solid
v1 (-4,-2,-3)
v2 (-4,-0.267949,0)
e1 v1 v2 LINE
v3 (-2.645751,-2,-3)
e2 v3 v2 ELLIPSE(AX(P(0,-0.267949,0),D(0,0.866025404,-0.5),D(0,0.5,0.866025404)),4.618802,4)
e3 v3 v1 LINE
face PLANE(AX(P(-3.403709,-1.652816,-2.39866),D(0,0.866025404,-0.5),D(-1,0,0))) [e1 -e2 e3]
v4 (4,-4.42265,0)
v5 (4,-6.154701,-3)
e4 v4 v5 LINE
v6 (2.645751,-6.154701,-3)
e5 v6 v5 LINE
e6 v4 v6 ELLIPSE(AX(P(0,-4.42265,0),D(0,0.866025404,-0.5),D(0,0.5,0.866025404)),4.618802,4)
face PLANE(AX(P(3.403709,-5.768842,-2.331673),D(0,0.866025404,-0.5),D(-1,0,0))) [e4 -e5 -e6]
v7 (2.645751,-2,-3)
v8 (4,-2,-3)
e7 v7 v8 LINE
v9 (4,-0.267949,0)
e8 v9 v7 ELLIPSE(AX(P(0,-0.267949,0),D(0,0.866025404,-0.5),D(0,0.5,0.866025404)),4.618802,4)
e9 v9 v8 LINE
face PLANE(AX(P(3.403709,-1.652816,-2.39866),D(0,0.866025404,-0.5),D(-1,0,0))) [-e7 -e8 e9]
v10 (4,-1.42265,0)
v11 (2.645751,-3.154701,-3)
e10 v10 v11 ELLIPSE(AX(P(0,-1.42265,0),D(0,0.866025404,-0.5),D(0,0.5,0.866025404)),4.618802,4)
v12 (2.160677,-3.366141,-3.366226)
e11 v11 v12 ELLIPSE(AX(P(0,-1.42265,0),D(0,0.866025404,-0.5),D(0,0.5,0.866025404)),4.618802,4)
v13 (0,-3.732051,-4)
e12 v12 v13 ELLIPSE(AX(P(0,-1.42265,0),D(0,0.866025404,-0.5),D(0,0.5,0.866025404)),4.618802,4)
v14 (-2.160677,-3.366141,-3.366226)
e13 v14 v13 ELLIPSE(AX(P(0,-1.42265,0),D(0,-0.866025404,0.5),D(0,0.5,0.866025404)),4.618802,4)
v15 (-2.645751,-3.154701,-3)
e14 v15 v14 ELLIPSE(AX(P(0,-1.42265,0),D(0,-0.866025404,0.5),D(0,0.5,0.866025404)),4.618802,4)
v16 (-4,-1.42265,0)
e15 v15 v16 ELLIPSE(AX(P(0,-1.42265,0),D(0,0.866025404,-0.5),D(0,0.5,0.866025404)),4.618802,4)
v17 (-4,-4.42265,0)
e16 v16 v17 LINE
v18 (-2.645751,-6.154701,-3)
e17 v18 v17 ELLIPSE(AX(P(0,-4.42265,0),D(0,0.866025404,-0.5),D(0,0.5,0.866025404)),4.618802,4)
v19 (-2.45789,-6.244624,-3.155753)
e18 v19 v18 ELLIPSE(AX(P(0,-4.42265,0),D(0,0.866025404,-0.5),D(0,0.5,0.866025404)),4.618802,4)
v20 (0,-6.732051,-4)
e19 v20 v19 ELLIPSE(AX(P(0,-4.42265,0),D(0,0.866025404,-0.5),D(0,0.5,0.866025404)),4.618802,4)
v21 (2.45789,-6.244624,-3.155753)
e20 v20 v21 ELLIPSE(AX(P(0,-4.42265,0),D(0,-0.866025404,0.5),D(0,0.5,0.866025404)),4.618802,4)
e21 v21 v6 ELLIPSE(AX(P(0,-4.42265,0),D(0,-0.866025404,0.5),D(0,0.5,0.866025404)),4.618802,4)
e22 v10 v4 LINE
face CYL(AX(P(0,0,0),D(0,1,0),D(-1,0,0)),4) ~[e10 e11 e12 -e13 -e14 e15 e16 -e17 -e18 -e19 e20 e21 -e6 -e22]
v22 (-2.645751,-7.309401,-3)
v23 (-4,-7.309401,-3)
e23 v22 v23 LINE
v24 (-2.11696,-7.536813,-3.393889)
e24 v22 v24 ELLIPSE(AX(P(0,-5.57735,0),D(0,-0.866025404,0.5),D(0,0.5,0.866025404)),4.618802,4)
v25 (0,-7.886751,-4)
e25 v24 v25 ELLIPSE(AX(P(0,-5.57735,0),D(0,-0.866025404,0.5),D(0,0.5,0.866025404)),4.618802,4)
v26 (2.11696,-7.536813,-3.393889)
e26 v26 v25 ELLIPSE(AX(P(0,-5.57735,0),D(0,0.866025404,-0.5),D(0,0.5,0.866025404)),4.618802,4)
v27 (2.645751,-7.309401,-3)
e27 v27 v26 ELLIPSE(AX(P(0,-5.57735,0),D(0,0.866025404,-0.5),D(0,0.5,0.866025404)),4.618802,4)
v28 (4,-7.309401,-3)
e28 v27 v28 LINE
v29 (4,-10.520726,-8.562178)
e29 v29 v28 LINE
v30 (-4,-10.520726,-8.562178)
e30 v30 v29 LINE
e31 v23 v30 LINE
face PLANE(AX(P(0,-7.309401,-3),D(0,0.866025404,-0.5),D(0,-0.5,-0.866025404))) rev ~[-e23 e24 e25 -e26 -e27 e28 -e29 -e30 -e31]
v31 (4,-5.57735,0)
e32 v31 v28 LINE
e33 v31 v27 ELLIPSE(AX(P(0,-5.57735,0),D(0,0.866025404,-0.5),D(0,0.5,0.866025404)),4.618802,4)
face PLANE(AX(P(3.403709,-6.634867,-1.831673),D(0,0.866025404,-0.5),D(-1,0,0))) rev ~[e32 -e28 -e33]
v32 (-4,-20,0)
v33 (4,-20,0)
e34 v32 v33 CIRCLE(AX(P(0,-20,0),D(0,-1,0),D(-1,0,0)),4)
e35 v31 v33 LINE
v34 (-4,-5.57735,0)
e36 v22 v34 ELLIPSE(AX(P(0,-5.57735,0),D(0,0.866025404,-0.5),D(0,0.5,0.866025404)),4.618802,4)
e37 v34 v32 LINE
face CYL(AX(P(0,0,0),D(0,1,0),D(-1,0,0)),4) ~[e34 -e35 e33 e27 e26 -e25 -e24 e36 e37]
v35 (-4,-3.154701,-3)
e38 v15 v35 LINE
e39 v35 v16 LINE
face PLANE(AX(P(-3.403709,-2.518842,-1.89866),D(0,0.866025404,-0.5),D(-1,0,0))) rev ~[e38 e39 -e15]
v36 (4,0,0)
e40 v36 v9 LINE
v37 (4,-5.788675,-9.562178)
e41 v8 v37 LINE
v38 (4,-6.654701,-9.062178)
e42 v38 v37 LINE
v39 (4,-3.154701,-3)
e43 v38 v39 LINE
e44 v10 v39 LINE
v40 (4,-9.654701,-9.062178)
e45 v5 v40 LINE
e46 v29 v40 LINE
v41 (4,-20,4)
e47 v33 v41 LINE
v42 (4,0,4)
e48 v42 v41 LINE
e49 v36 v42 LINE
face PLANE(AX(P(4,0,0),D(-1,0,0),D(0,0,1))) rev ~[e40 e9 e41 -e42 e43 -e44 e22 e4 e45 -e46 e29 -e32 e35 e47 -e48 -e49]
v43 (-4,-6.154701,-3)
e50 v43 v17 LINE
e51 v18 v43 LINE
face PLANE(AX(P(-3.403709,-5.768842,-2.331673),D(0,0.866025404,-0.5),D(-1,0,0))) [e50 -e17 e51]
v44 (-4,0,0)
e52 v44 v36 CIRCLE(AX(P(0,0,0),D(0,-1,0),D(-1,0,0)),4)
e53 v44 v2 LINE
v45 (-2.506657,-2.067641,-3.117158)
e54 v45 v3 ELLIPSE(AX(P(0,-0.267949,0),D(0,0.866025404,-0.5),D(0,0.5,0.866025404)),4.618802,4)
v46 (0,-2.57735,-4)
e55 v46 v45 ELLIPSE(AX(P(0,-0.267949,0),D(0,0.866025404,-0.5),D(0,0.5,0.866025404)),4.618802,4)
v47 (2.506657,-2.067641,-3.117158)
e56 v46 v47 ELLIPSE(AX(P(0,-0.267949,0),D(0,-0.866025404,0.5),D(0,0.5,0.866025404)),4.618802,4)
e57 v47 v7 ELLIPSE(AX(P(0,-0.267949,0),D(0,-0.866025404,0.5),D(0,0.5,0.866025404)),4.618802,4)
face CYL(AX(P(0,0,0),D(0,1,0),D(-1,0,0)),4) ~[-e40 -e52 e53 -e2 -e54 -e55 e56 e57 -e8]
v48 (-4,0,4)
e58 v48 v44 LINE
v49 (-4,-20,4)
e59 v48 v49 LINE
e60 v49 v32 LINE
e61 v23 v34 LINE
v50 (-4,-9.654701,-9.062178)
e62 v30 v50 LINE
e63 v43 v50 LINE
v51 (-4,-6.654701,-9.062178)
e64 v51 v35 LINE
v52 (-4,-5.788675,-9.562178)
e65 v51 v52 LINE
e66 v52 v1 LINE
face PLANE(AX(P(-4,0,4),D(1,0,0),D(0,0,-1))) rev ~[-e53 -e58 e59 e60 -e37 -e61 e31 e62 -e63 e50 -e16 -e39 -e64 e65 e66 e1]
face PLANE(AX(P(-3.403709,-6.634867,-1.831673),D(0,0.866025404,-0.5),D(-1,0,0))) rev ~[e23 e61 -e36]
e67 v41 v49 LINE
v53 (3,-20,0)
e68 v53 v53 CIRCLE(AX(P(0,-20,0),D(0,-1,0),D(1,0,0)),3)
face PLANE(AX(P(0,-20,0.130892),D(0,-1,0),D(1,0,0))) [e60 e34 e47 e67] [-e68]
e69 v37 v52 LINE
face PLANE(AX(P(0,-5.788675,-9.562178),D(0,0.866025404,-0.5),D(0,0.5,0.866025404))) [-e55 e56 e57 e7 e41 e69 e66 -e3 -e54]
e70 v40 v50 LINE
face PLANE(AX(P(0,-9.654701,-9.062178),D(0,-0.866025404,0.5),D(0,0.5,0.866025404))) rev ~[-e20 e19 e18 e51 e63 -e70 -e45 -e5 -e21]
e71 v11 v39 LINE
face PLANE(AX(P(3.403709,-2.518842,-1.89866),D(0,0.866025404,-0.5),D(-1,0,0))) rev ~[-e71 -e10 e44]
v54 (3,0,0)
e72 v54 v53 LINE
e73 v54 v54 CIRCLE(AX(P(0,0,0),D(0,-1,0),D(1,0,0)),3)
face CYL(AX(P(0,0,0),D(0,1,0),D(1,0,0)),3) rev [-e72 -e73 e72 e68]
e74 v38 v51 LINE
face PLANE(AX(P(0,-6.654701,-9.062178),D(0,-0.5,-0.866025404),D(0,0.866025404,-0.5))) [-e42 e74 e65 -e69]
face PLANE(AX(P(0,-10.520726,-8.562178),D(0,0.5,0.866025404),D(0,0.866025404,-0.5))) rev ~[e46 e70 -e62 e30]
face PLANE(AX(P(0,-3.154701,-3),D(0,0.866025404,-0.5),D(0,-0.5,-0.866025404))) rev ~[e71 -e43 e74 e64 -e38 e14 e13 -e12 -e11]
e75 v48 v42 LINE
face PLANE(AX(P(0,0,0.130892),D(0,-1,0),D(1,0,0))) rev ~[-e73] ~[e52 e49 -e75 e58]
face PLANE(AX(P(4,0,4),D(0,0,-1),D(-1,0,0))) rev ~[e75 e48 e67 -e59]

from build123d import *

# Parameters (mm, degrees)
F0_R          = 3
F1_DEPTH      = 20
F3_DEPTH      = 4
F3_DEPTH_BACK = 4
F6_DEPTH      = 1
F9_DEPTH      = 1
F10_DEPTH     = 20


with BuildPart() as f1:
    # F0 (on Front) → F1 (new body)
    with BuildSketch(Plane.XZ):
        with BuildLine():
            ThreePointArc((-4, 0), (0, -4), (4, 0))
            ThreePointArc((4, 0), (2.8284271247, 2.8284271247), (0, 4))
            ThreePointArc((0, 4), (-2.8284271247, 2.8284271247), (-4, 0))
        make_face()
        Circle(F0_R, mode=Mode.SUBTRACT)
    extrude(amount=F1_DEPTH)

    # F2 (on Right) → F3 (join, two sides)
    with BuildSketch(Plane.YZ) as f3_sk:
        Polygon((-5.7886751346, -9.5621778265), (-2, -3), (-3.1547005384, -3), (-6.6547005384, -9.0621778265), align=None)
        Polygon((-9.6547005384, -9.0621778265), (-6.1547005384, -3), (-7.3094010768, -3), (-10.5207259422, -8.5621778265), align=None)
    extrude(amount=F3_DEPTH)
    extrude(f3_sk.sketch, amount=-F3_DEPTH_BACK)

    # F5 (on offset) → F6 (join)
    with BuildSketch(Plane(origin=(0, -0.2009618943, 0.1160254038), x_dir=(-1, 0, 0), z_dir=(0, 0.8660254038, -0.5))):
        Polygon((4, -5), (4, 0), (2, -5), align=None)
        Polygon((-2, -5), (-4, 0), (-4, -5), align=None)
    extrude(amount=-F6_DEPTH)

    # F8 (on offset) → F9 (join)
    with BuildSketch(Plane(origin=(0, -3.3169872981, 1.9150635095), x_dir=(-1, 0, 0), z_dir=(0, 0.8660254038, -0.5))):
        Polygon((4, -7), (4, -2), (2, -7), align=None)
        Polygon((-4, -7), (-2, -7), (-4, -2), align=None)
    extrude(amount=-F9_DEPTH)

    # F0 (on Front) → F10 (join)
    with BuildSketch(Plane.XZ):
        with BuildLine():
            ThreePointArc((-4, 0), (0, -4), (4, 0))
            ThreePointArc((4, 0), (2.8284271247, 2.8284271247), (0, 4))
            ThreePointArc((0, 4), (-2.8284271247, 2.8284271247), (-4, 0))
        make_face()
        Circle(F0_R, mode=Mode.SUBTRACT)
        with BuildLine():
            ThreePointArc((0, 4), (2.8284271247, 2.8284271247), (4, 0))
            Line((4, 0), (4, 4))
            Line((4, 4), (0, 4))
        make_face()
        with BuildLine():
            ThreePointArc((-4, 0), (-2.8284271247, 2.8284271247), (0, 4))
            Line((0, 4), (-4, 4))
            Line((-4, 4), (-4, 0))
        make_face()
    extrude(amount=F10_DEPTH)


solid = f1.part
